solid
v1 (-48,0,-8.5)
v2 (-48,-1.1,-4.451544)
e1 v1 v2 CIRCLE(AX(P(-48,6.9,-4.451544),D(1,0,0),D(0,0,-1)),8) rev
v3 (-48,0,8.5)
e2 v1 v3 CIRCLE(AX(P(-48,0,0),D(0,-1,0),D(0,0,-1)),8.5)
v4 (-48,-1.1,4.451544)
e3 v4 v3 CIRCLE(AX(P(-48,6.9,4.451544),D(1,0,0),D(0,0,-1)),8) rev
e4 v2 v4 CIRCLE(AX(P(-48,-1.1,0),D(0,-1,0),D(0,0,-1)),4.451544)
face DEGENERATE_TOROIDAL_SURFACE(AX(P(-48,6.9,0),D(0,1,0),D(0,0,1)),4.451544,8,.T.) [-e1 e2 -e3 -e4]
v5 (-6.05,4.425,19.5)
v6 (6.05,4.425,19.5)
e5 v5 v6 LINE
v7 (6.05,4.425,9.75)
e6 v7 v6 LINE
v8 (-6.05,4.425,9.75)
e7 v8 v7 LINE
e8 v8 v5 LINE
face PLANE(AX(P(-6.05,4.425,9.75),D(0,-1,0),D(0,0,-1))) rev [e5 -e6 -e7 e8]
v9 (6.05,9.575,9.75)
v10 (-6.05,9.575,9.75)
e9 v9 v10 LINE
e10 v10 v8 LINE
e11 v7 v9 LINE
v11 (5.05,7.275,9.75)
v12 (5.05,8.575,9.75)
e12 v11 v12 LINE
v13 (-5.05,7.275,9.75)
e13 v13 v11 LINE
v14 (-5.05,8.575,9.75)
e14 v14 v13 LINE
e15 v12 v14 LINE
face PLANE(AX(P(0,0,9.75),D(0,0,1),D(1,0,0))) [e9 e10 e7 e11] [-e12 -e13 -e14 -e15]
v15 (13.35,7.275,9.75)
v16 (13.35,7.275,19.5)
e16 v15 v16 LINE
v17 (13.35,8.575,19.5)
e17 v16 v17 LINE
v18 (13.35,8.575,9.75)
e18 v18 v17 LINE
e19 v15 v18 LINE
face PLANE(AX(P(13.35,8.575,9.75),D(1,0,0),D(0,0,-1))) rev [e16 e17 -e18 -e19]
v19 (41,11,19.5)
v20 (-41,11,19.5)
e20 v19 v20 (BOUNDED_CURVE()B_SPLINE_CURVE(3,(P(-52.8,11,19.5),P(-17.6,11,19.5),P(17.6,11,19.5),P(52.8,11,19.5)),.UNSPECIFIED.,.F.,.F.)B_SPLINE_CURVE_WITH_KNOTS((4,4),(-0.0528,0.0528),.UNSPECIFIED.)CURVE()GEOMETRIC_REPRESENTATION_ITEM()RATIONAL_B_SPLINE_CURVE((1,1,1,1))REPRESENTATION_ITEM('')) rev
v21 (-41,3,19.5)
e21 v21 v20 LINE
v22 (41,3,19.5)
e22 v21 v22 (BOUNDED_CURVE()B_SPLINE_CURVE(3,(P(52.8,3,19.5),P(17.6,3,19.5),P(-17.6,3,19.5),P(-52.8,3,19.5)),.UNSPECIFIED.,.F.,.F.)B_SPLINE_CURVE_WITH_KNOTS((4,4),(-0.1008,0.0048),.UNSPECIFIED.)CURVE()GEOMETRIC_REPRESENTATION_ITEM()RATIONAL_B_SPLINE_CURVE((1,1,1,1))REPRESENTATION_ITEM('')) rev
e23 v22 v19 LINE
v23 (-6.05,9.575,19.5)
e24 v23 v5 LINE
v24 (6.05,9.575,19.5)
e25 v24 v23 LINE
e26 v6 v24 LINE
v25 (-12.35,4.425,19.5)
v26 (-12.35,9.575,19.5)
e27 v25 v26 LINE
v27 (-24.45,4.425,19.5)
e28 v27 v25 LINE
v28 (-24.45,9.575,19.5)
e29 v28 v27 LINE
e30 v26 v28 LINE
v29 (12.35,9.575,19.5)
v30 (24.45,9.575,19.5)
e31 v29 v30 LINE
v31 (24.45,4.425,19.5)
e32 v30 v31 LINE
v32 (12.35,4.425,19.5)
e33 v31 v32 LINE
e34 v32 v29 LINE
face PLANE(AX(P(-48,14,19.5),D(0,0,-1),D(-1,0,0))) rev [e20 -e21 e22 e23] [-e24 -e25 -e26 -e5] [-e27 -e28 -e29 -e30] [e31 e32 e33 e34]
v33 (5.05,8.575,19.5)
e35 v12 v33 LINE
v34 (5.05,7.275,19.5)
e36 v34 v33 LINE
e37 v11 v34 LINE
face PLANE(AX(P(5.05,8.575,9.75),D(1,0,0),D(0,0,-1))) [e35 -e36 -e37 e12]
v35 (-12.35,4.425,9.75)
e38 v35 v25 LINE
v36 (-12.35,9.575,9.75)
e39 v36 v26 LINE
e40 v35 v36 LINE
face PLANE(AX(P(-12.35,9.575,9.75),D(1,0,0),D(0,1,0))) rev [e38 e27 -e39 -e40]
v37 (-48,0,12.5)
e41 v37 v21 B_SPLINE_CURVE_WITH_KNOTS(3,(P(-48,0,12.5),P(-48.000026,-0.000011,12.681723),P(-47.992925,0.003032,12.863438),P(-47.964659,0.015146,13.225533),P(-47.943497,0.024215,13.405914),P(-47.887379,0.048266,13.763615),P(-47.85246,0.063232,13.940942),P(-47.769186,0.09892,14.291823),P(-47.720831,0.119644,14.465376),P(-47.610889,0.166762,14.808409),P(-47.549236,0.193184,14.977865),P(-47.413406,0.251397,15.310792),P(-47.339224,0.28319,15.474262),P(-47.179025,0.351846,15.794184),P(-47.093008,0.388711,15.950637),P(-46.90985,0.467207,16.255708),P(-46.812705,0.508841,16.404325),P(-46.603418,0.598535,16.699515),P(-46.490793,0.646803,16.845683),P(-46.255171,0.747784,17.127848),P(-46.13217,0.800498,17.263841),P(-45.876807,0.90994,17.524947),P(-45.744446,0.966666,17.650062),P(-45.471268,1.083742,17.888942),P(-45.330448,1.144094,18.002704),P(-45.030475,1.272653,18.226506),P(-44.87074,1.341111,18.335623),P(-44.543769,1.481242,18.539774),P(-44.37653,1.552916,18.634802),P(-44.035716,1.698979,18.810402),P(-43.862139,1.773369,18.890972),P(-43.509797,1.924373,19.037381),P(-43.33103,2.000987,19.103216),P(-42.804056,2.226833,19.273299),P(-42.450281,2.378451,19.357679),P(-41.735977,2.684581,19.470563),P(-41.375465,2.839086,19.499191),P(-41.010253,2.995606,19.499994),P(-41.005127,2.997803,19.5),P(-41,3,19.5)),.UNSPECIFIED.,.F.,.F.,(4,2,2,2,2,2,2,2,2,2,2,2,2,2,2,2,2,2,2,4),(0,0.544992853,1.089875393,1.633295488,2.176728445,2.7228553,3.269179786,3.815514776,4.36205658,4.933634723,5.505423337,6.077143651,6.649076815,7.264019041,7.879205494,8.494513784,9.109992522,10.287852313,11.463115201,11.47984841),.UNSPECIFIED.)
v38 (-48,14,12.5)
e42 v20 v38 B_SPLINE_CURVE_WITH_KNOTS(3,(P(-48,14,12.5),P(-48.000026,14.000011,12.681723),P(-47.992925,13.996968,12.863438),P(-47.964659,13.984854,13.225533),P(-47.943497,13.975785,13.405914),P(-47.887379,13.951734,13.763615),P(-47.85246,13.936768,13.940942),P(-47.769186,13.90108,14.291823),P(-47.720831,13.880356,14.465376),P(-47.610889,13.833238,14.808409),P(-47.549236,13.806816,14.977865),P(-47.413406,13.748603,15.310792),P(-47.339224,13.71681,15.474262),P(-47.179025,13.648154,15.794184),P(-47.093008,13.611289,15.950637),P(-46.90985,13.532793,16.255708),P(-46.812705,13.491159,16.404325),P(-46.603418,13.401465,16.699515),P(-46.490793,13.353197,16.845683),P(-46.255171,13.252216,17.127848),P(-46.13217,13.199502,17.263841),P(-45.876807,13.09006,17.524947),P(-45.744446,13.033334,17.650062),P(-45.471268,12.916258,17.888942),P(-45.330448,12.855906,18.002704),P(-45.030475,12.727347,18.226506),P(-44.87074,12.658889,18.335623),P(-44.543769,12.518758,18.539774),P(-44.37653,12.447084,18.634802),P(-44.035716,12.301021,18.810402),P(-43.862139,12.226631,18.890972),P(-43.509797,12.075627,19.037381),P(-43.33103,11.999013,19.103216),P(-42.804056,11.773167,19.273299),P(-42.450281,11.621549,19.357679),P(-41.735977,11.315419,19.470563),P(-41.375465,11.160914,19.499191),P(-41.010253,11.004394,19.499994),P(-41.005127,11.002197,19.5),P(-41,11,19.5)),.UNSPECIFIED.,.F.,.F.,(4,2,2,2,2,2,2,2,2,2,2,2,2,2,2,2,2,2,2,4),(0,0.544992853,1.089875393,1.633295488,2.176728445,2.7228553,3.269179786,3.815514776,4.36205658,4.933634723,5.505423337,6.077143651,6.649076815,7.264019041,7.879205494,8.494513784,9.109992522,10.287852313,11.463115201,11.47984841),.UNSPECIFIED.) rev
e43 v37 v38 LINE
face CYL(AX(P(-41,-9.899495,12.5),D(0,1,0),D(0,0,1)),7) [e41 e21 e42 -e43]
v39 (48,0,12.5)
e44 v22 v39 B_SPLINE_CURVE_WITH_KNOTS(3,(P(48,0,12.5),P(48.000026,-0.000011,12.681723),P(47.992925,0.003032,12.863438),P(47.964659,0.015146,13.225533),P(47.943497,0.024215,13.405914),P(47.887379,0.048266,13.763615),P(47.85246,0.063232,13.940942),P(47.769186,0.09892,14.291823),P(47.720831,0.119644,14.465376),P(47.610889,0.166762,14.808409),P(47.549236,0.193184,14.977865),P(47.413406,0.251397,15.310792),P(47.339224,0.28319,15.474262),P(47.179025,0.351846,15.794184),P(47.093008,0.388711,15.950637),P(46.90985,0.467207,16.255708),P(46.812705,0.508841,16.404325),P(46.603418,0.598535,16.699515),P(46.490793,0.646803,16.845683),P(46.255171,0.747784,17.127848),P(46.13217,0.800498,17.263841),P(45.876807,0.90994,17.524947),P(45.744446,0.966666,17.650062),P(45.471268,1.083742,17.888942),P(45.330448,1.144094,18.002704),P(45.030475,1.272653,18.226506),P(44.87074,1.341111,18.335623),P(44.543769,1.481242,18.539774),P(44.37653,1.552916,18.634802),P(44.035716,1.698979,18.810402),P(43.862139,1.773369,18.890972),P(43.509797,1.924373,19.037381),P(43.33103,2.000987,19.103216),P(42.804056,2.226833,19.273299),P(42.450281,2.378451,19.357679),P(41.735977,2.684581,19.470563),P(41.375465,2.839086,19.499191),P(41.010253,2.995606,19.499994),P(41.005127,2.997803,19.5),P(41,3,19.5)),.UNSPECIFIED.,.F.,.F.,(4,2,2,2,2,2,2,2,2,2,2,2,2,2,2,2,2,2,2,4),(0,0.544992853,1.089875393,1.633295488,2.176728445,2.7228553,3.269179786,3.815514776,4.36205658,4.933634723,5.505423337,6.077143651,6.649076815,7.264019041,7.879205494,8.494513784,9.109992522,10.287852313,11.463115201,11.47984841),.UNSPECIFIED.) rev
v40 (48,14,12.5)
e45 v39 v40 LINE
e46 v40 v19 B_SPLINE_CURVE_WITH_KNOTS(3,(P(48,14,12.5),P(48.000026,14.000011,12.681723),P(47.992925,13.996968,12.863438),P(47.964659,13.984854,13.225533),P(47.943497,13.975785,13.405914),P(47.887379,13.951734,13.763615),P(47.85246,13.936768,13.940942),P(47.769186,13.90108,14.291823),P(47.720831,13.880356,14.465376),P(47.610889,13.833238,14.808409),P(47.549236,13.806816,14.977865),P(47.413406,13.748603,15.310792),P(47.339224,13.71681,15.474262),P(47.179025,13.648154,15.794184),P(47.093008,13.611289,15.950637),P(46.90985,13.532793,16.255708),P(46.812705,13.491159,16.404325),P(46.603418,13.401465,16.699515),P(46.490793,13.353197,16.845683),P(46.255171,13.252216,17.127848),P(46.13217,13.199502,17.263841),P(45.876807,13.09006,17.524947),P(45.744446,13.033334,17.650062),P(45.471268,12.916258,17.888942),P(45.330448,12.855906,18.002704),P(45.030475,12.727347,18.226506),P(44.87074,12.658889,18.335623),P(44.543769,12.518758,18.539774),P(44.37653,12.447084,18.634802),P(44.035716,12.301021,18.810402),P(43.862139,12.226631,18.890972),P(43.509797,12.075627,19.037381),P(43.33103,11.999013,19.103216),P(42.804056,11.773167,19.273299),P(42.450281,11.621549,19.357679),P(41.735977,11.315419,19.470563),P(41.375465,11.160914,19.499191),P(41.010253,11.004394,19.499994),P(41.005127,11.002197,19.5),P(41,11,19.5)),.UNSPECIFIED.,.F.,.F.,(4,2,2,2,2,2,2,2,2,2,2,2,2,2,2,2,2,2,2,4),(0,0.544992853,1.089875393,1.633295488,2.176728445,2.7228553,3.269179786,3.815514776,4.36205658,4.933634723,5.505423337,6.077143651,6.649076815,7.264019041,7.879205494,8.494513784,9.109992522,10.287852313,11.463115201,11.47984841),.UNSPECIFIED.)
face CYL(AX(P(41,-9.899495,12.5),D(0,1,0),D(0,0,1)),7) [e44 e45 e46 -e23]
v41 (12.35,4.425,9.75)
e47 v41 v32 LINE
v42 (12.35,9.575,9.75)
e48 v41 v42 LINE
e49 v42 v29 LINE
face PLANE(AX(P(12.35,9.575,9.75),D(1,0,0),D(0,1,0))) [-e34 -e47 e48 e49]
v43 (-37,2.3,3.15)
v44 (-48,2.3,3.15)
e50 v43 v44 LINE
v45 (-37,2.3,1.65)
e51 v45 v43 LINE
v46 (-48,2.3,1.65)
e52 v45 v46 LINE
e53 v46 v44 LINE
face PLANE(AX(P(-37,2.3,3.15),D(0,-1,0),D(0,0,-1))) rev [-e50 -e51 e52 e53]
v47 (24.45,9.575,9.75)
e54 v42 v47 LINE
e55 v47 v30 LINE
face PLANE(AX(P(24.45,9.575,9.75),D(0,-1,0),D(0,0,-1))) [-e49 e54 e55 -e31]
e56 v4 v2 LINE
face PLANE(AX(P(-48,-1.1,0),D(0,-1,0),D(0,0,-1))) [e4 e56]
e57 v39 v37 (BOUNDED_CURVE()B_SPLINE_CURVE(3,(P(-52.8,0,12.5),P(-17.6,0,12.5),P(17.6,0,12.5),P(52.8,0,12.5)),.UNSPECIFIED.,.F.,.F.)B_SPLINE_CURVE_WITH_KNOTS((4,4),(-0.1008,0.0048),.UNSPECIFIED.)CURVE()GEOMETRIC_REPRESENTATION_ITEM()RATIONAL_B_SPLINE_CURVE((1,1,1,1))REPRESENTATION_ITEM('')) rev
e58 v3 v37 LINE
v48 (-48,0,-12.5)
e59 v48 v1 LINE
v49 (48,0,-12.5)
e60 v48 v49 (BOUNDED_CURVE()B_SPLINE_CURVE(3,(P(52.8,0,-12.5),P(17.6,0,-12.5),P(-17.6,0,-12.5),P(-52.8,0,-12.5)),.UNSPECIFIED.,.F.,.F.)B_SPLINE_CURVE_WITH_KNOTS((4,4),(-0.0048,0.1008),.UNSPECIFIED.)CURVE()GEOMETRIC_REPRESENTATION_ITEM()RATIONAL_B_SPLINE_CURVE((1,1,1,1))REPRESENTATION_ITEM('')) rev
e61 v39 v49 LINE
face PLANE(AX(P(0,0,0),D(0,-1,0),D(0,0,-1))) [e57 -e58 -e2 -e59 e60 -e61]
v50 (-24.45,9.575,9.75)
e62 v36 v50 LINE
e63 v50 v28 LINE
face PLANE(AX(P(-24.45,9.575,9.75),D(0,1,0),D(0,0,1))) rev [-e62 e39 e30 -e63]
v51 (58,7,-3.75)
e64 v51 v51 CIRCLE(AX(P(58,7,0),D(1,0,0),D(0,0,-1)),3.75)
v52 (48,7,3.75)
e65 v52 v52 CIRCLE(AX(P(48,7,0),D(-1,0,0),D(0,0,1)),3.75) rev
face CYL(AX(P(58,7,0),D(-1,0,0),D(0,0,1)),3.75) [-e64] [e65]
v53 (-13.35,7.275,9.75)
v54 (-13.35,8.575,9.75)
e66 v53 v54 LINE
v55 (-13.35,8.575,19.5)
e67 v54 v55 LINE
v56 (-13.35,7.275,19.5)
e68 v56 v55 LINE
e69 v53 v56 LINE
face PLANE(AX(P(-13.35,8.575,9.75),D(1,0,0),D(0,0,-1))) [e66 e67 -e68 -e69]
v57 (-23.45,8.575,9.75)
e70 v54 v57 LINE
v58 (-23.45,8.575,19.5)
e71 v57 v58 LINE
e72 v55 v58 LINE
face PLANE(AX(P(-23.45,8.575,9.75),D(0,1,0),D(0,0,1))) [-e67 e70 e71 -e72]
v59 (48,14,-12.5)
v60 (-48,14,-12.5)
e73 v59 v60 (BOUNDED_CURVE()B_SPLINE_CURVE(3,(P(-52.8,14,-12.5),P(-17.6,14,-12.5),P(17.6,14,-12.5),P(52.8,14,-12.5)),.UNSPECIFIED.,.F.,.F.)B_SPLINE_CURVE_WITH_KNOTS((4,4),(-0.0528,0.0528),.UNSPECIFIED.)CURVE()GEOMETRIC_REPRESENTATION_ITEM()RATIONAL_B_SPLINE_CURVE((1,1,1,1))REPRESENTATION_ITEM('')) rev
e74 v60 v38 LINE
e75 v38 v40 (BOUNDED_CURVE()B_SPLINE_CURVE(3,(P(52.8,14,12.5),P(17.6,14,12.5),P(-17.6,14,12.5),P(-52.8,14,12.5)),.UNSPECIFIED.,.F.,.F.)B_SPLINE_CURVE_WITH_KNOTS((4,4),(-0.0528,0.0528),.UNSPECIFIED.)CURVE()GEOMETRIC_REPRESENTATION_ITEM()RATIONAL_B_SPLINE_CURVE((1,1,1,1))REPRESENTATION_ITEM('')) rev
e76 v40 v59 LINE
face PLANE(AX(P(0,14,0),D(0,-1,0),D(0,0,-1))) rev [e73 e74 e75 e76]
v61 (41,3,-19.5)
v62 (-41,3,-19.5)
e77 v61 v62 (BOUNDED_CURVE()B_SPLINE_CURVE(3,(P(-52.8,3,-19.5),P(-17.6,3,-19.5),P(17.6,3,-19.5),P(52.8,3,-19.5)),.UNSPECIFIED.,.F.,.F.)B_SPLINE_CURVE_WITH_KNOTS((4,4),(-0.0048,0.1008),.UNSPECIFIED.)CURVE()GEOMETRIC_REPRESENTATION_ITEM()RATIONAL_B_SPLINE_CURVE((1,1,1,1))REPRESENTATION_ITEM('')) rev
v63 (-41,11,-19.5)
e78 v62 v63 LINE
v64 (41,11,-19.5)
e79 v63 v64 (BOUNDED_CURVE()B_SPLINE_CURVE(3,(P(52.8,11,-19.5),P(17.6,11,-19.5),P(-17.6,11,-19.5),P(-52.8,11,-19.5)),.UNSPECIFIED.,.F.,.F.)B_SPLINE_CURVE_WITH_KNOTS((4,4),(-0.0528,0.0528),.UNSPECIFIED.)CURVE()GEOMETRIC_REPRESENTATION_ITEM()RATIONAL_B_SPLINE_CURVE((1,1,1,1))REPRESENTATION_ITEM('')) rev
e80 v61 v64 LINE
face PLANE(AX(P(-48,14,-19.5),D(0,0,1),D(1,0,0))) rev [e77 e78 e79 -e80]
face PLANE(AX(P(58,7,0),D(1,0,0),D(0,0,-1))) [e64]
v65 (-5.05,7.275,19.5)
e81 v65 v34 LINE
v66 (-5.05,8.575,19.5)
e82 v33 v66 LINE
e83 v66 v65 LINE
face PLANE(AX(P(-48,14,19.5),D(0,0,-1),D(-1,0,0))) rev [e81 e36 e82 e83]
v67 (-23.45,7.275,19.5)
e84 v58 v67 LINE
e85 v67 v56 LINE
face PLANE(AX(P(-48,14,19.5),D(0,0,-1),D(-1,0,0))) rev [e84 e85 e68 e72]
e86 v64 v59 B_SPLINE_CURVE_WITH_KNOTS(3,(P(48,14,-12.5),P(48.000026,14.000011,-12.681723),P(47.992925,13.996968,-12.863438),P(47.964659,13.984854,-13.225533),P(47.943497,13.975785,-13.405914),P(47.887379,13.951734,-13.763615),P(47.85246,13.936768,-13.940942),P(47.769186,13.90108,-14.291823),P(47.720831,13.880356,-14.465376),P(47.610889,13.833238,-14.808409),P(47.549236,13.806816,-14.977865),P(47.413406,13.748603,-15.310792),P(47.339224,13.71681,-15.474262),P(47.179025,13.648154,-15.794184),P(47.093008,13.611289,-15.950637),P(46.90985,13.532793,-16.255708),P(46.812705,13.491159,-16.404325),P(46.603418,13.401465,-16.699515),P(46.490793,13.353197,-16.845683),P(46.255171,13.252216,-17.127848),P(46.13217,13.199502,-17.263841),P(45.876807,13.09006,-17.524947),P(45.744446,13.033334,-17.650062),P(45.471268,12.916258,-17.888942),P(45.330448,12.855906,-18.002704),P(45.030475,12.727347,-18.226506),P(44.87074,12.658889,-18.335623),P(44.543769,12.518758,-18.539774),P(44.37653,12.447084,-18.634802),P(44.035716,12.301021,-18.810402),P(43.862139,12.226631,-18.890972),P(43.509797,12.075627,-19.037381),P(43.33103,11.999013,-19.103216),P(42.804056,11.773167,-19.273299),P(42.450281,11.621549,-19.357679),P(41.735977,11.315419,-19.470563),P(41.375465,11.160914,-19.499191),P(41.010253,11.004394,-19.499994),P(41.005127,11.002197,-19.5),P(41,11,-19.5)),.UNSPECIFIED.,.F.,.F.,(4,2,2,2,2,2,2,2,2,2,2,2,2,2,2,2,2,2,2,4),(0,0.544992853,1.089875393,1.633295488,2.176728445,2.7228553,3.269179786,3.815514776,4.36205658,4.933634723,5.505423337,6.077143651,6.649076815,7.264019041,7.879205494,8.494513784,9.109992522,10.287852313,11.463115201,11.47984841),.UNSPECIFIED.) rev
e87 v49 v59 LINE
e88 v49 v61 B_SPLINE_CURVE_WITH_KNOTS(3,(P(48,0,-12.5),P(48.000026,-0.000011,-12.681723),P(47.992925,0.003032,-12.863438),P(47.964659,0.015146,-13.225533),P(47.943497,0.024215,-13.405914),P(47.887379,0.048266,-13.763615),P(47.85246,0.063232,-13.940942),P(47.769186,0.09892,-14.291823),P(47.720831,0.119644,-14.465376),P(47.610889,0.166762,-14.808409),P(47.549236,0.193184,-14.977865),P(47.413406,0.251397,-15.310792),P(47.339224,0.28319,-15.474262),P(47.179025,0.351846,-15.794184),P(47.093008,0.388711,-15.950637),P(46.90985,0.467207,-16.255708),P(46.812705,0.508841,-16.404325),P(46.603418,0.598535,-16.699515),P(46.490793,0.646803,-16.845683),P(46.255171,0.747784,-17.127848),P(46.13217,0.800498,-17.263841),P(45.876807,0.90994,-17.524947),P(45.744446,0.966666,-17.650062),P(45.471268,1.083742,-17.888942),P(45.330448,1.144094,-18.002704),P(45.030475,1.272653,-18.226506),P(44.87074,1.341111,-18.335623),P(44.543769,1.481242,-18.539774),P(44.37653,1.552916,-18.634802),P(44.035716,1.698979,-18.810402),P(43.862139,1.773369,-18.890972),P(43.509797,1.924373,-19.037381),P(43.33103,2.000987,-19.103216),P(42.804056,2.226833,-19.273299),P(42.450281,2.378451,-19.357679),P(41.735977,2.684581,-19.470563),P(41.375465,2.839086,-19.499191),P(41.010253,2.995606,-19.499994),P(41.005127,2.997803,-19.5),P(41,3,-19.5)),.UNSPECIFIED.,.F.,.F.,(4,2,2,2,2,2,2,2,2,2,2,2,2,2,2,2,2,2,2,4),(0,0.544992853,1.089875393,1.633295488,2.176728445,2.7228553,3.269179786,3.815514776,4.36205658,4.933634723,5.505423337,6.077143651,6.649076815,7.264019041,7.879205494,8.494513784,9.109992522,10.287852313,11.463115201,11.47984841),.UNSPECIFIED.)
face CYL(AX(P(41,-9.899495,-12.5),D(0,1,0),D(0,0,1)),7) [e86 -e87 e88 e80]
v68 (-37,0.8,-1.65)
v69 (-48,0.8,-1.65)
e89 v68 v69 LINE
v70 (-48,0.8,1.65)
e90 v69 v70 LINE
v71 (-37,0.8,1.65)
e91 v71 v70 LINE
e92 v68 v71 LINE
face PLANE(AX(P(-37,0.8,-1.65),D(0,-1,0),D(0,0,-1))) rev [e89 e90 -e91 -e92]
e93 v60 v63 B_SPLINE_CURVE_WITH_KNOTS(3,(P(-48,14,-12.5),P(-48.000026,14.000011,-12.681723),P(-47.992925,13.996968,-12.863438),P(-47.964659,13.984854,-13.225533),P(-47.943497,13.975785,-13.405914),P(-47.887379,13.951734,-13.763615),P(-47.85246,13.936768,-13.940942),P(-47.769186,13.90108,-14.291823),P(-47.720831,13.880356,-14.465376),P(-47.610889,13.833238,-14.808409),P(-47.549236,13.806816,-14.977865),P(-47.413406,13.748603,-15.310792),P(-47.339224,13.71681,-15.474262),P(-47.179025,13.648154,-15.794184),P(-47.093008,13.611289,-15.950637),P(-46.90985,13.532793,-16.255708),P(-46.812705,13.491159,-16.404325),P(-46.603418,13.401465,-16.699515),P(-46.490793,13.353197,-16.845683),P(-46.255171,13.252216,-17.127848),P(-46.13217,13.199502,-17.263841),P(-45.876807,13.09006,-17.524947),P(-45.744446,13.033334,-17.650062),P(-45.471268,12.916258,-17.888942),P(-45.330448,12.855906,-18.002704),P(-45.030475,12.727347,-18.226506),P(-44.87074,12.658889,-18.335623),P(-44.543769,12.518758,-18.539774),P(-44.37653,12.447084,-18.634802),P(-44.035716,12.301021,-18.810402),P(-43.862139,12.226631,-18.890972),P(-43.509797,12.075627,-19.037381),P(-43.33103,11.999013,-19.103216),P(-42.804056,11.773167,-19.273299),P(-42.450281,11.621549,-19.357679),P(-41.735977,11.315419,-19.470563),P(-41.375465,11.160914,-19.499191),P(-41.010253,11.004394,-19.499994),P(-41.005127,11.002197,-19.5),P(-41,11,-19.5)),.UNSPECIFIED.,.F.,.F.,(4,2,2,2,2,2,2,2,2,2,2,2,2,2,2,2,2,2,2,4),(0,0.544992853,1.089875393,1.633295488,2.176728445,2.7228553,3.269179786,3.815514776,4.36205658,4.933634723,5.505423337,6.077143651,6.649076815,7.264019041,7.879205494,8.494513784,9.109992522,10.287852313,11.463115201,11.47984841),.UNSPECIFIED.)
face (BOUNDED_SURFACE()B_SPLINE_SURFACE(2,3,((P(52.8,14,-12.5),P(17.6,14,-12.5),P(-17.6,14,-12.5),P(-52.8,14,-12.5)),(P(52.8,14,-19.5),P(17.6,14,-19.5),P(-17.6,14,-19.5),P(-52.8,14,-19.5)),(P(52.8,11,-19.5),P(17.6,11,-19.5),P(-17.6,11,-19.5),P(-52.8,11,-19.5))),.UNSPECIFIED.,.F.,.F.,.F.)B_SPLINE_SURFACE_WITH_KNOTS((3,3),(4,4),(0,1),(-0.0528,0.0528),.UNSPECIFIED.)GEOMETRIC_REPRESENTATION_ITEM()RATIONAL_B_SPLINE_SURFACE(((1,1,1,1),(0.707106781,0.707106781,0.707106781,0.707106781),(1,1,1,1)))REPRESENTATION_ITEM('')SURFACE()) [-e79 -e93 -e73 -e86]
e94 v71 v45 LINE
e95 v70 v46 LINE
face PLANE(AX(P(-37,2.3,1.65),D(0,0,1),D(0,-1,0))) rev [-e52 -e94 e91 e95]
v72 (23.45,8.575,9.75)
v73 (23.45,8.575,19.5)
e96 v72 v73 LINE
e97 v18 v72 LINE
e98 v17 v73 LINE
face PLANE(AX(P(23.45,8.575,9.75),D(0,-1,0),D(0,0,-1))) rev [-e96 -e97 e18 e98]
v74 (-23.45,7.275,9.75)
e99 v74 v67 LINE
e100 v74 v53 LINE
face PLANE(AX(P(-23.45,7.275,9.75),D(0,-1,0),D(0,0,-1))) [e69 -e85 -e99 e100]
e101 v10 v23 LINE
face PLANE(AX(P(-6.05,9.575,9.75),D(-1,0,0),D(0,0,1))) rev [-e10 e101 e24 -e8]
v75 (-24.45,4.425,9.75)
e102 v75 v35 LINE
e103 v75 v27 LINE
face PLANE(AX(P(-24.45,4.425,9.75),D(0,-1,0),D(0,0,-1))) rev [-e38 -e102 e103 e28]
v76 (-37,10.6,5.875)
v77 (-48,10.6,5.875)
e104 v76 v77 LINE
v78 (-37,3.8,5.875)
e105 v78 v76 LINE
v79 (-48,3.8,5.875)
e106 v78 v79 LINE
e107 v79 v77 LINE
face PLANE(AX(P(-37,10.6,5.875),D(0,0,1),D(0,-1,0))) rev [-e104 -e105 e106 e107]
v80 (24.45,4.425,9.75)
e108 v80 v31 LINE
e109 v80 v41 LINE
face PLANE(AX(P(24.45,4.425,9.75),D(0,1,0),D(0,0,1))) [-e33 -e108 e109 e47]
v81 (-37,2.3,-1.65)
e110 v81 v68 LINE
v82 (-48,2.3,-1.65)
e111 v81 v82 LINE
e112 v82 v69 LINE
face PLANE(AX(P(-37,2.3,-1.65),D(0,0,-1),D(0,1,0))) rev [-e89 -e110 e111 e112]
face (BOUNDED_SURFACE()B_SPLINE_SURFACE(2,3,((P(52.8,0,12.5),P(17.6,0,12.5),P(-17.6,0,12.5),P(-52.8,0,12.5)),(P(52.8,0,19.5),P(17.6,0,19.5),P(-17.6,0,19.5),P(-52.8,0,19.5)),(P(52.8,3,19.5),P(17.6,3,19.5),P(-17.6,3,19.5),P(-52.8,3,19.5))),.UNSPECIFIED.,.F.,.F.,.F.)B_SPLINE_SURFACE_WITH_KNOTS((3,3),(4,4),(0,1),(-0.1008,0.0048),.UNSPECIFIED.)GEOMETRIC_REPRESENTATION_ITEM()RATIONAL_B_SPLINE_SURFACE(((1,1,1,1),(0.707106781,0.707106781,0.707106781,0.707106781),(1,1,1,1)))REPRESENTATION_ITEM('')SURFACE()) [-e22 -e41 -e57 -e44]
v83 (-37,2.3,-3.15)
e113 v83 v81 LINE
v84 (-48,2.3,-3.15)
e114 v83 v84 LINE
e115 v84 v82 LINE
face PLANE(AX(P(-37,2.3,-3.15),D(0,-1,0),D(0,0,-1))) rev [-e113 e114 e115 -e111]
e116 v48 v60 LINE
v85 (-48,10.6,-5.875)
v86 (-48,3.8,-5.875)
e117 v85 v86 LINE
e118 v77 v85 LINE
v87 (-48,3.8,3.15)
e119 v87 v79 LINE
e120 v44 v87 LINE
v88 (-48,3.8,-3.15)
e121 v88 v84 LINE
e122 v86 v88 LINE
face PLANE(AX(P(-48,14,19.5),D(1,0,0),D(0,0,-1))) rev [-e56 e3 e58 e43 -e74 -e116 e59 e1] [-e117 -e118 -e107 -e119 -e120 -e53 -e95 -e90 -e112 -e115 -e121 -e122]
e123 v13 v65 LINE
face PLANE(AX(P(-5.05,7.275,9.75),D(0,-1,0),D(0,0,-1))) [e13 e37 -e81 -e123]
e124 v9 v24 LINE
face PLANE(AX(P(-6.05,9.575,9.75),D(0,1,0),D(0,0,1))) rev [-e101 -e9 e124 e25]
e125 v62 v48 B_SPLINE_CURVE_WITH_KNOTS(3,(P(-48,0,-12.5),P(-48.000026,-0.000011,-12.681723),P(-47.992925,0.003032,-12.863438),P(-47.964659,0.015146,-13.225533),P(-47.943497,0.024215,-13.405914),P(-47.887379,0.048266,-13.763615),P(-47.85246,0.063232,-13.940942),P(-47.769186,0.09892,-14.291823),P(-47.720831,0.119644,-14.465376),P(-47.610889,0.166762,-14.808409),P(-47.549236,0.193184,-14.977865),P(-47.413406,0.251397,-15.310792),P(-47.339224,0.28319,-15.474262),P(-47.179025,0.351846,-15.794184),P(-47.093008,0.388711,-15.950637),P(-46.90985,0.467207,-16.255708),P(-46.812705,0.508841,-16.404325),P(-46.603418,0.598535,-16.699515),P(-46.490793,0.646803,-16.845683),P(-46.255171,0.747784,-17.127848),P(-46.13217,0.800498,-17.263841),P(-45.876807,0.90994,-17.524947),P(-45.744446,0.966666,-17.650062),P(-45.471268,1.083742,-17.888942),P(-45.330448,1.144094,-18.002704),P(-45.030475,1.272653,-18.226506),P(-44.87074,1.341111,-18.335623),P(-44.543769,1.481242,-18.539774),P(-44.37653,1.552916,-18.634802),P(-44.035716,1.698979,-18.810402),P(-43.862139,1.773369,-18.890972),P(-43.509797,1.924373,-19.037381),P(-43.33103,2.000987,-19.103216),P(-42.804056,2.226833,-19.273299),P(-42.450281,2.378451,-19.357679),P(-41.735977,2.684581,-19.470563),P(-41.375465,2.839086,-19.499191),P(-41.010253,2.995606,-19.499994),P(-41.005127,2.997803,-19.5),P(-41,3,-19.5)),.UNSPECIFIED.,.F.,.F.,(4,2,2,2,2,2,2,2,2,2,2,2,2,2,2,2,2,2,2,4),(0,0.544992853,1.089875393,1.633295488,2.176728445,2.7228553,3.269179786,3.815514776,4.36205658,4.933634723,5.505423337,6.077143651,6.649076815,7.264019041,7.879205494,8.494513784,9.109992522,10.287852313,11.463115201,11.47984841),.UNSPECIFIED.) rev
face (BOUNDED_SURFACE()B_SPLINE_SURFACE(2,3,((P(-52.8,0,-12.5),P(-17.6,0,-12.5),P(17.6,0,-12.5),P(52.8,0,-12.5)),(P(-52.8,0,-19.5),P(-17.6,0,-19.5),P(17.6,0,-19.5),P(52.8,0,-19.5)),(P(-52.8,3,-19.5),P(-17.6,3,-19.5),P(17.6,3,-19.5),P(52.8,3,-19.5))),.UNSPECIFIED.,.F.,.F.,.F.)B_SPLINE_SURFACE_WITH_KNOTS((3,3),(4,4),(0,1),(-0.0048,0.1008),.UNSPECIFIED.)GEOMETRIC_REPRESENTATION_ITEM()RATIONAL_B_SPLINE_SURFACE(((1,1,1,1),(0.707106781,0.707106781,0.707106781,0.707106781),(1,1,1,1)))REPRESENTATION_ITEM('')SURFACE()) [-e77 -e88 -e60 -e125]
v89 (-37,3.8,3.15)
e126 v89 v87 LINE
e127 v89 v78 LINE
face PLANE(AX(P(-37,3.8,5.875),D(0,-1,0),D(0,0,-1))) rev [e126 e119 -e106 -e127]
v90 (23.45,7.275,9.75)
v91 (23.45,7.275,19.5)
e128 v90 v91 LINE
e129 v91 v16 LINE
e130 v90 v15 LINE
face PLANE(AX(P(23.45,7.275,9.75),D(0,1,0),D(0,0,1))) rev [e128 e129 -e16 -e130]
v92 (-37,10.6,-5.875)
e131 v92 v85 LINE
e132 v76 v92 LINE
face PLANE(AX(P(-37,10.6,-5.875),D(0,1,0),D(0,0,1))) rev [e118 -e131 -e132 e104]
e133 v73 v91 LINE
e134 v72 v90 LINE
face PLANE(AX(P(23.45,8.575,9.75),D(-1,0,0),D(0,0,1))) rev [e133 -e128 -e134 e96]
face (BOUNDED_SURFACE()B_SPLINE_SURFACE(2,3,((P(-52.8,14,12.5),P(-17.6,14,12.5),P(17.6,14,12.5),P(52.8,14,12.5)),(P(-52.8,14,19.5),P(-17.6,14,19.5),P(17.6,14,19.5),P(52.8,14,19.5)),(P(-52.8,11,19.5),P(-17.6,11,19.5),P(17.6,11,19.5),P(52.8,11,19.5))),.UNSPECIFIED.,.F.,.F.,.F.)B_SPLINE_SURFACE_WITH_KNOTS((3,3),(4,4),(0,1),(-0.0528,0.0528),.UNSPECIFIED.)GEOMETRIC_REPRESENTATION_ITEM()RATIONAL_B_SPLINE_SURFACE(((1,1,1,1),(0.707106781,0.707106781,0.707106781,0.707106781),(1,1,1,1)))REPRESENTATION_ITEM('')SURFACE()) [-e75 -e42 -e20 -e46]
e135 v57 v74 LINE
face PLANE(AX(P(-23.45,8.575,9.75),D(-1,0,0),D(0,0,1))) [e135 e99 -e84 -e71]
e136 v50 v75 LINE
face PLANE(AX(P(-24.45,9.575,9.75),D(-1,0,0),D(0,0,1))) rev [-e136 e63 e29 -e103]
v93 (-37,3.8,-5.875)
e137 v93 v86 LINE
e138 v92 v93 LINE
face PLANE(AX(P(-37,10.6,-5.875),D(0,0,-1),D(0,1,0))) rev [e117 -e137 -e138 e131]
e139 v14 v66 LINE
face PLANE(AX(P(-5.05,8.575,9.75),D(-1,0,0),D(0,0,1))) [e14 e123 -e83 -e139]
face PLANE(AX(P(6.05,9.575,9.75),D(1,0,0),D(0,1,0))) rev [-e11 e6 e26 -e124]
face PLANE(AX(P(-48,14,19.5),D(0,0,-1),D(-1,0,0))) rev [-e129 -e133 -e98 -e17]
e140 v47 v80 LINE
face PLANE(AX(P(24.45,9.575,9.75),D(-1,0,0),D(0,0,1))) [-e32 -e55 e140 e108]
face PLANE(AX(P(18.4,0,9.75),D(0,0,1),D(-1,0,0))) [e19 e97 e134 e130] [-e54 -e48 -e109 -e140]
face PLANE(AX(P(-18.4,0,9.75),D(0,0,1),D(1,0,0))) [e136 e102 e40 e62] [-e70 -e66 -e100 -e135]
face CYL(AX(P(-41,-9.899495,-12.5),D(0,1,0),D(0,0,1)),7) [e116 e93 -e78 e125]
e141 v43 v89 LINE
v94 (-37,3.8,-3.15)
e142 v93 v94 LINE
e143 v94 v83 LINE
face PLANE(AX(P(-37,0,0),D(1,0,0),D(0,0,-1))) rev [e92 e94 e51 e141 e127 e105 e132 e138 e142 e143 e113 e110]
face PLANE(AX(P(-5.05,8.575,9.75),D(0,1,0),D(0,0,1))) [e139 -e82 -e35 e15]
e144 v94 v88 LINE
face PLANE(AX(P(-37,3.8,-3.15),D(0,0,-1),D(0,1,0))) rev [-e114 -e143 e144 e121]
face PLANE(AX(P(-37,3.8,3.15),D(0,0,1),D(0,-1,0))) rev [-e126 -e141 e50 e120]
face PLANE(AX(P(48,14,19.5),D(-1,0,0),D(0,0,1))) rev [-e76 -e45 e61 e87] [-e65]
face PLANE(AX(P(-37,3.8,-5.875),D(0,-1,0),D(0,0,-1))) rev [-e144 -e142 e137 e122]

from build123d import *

# Parameters (mm, degrees)
SZKIC1_W                    = 96
SZKIC1_H                    = 39
DODANIE_WYCI_GNI_CIE1_DEPTH = 14
ZAOKR_GLENIE2_SIZE          = 3
ZAOKR_GLENIE2_SIZE_2        = 7
WYTNIJ_WYCI_GNI_CIE1_REACH  = 55.668
SZKIC3_R                    = 3.75
DODANIE_WYCI_GNI_CIE2_DEPTH = 10
DODANIE_WYCI_GNI_CIE3_DEPTH = 1.1
ZAOKR_GLENIE3_R             = 8
WYTNIJ_WYCI_GNI_CIE2_DEPTH  = 11
SZKIC6_W                    = 12.1
SZKIC6_H                    = 5.15
SZKIC6_W_2                  = 10.1
SZKIC6_H_2                  = 1.3
WYTNIJ_WYCI_GNI_CIE3_DEPTH  = 9.75
SZYK_LINIOWY1_COUNT         = 2
SZYK_LINIOWY1_PITCH         = 18.4
LUSTRO1_COPY_1_SKETCH_W     = 12.1
LUSTRO1_COPY_1_SKETCH_H     = 5.15
LUSTRO1_COPY_1_SKETCH_W_2   = 10.1
LUSTRO1_COPY_1_SKETCH_H_2   = 1.3
LUSTRO1_COPY_1_DEPTH        = 9.75
LUSTRO1_COPY_2_SKETCH_W     = 12.1
LUSTRO1_COPY_2_SKETCH_H     = 5.15
LUSTRO1_COPY_2_SKETCH_W_2   = 10.1
LUSTRO1_COPY_2_SKETCH_H_2   = 1.3
LUSTRO1_COPY_2_DEPTH        = 9.75


with BuildPart() as part:
    # Szkic1 → Dodanie-wyciągnięcie1 (new body)
    with BuildSketch(Plane(origin=(0, 0, 0), x_dir=(1, 0, 0), z_dir=(0, 1, 0))):
        Rectangle(SZKIC1_W, SZKIC1_H)
    extrude(amount=DODANIE_WYCI_GNI_CIE1_DEPTH)

    # Zaokrąglenie2
    # an asymmetric fillet: 7, 3 mm, written as the material it takes off along each edge
    with BuildSketch(Plane(origin=(65.5, 0, -19.5), x_dir=(0, 1, 0), z_dir=(-1, 0, 0)), Plane(origin=(-65.5, 0, 19.5), x_dir=(0, 1, 0), z_dir=(1, 0, 0))) as zaokr_glenie2_piece_1:
        with BuildLine():
            Bezier((ZAOKR_GLENIE2_SIZE, 0), (0, 0), (0, -ZAOKR_GLENIE2_SIZE_2), weights=[1, 0.707106781, 1])
            Line((0, -ZAOKR_GLENIE2_SIZE_2), (0, 0))
            Line((0, 0), (ZAOKR_GLENIE2_SIZE, 0))
        make_face()
    extrude(amount=131, mode=Mode.SUBTRACT)
    with BuildSketch(Plane(origin=(65.5, 14, -19.5), x_dir=(0, -1, 0), z_dir=(-1, 0, 0)), Plane(origin=(-65.5, 14, 19.5), x_dir=(0, -1, 0), z_dir=(1, 0, 0))) as zaokr_glenie2_piece_2:
        with BuildLine():
            Bezier((ZAOKR_GLENIE2_SIZE, 0), (0, 0), (0, ZAOKR_GLENIE2_SIZE_2), weights=[1, 0.707106781, 1])
            Line((0, ZAOKR_GLENIE2_SIZE_2), (0, 0))
            Line((0, 0), (ZAOKR_GLENIE2_SIZE, 0))
        make_face()
    extrude(amount=131, mode=Mode.SUBTRACT)

    # Wytnij-wyciągnięcie1: up to this face of the body (flat: up to its plane)
    wytnij_wyci_gni_cie1_end = Plane(part.part.faces().sort_by_distance((0, 0, 0))[0])
    # Szkic2 → Wytnij-wyciągnięcie1 (cut, up to the picked face)
    with BuildSketch(Plane(origin=(0, 14, 0), x_dir=(1, 0, 0), z_dir=(0, 1, 0)), mode=Mode.PRIVATE) as wytnij_wyci_gni_cie1_sk1:
        with BuildLine():
            Line((-48, -19.5), (-41, -19.5))
            ThreePointArc((-41, -19.5), (-45.949747468, -17.449747468), (-48, -12.5))
            Line((-48, -12.5), (-48, -19.5))
        make_face()
    wytnij_wyci_gni_cie1_tool1 = split(extrude(wytnij_wyci_gni_cie1_sk1.sketch, amount=-WYTNIJ_WYCI_GNI_CIE1_REACH, mode=Mode.PRIVATE), bisect_by=wytnij_wyci_gni_cie1_end, keep=Keep.BOTH, mode=Mode.PRIVATE)
    # Szkic2 → Wytnij-wyciągnięcie1 (cut, up to the picked face)
    with BuildSketch(Plane(origin=(0, 14, 0), x_dir=(1, 0, 0), z_dir=(0, 1, 0)), mode=Mode.PRIVATE) as wytnij_wyci_gni_cie1_sk2:
        with BuildLine():
            Line((-48, 19.5), (-41, 19.5))
            ThreePointArc((-41, 19.5), (-45.949747468, 17.449747468), (-48, 12.5))
            Line((-48, 12.5), (-48, 19.5))
        make_face()
    wytnij_wyci_gni_cie1_tool2 = split(extrude(wytnij_wyci_gni_cie1_sk2.sketch, amount=-WYTNIJ_WYCI_GNI_CIE1_REACH, mode=Mode.PRIVATE), bisect_by=wytnij_wyci_gni_cie1_end, keep=Keep.BOTH, mode=Mode.PRIVATE)
    # Szkic2 → Wytnij-wyciągnięcie1 (cut, up to the picked face)
    with BuildSketch(Plane(origin=(0, 14, 0), x_dir=(1, 0, 0), z_dir=(0, 1, 0)), mode=Mode.PRIVATE) as wytnij_wyci_gni_cie1_sk3:
        with BuildLine():
            Line((48, -19.5), (48, -12.5))
            ThreePointArc((48, -12.5), (45.949747468, -17.449747468), (41, -19.5))
            Line((41, -19.5), (48, -19.5))
        make_face()
    wytnij_wyci_gni_cie1_tool3 = split(extrude(wytnij_wyci_gni_cie1_sk3.sketch, amount=-WYTNIJ_WYCI_GNI_CIE1_REACH, mode=Mode.PRIVATE), bisect_by=wytnij_wyci_gni_cie1_end, keep=Keep.BOTH, mode=Mode.PRIVATE)
    # Szkic2 → Wytnij-wyciągnięcie1 (cut, up to the picked face)
    with BuildSketch(Plane(origin=(0, 14, 0), x_dir=(1, 0, 0), z_dir=(0, 1, 0)), mode=Mode.PRIVATE) as wytnij_wyci_gni_cie1_sk4:
        with BuildLine():
            Line((41, 19.5), (48, 19.5))
            Line((48, 19.5), (48, 12.5))
            ThreePointArc((48, 12.5), (45.949747468, 17.449747468), (41, 19.5))
        make_face()
    wytnij_wyci_gni_cie1_tool4 = split(extrude(wytnij_wyci_gni_cie1_sk4.sketch, amount=-WYTNIJ_WYCI_GNI_CIE1_REACH, mode=Mode.PRIVATE), bisect_by=wytnij_wyci_gni_cie1_end, keep=Keep.BOTH, mode=Mode.PRIVATE)
    add(wytnij_wyci_gni_cie1_tool1.solids().sort_by(Axis((-46.436424, 14, 17.936424), (0, -1, 0)))[0], mode=Mode.SUBTRACT)
    add(wytnij_wyci_gni_cie1_tool2.solids().sort_by(Axis((-46.436424, 14, -17.936424), (0, -1, 0)))[0], mode=Mode.SUBTRACT)
    add(wytnij_wyci_gni_cie1_tool3.solids().sort_by(Axis((46.436424, 14, 17.936424), (0, -1, 0)))[0], mode=Mode.SUBTRACT)
    add(wytnij_wyci_gni_cie1_tool4.solids().sort_by(Axis((46.436424, 14, -17.936424), (0, -1, 0)))[0], mode=Mode.SUBTRACT)

    # Szkic3 → Dodanie-wyciągnięcie2 (add)
    with BuildSketch(Plane(origin=(48, 0, 0), x_dir=(0, 0, -1), z_dir=(1, 0, 0))):
        with Locations(Location((0, 7, 0), (0, 0, 180))):
            Circle(SZKIC3_R)
    extrude(amount=DODANIE_WYCI_GNI_CIE2_DEPTH)

    # Szkic4 → Dodanie-wyciągnięcie3 (add)
    with BuildSketch(Plane.XZ):
        with BuildLine():
            Line((-48, 8.5), (-48, -8.5))
            ThreePointArc((-48, -8.5), (-39.5, 0), (-48, 8.5))
        make_face()
    extrude(amount=DODANIE_WYCI_GNI_CIE3_DEPTH)

    # Zaokrąglenie3
    # the kernel refuses this fillet: 8 mm, written as the material it takes off along each edge
    with BuildSketch(Plane(origin=(-48, -1.1, 0), x_dir=(-0.9293459551729958, 0, -0.36921009683321493), z_dir=(-0.36921009683321493, 0, 0.9293459551729958))) as zaokr_glenie3_piece_1:
        with BuildLine():
            CenterArc((4.451543504, -8), ZAOKR_GLENIE3_R, 59.598452337, 30.401547663)
            Line((4.451543504, 0), (4.451543504, 0.16))
            Line((4.451543504, 0.16), (8.5, 0.16))
            Line((8.5, 0.16), (8.66, 0))
            ThreePointArc((8.66, 0), (8.66, -0.55), (8.58096913, -0.962))
            Line((8.58096913, -0.962), (8.5, -1.1))
        make_face()
    revolve(axis=Axis((-48, -1.1, 0), (0, -1, 0)), revolution_arc=316.666179678, mode=Mode.SUBTRACT)

    # Szkic5 → Wytnij-wyciągnięcie2 (cut)
    with BuildSketch(Plane.ZY.offset(48)):
        Polygon((-5.875, 10.6), (5.875, 10.6), (5.875, 3.8), (3.15, 3.8), (3.15, 2.3), (1.65, 2.3), (1.65, 0.8), (-1.65, 0.8), (-1.65, 2.3), (-3.15, 2.3), (-3.15, 3.8), (-5.875, 3.8), align=None)
    extrude(amount=-WYTNIJ_WYCI_GNI_CIE2_DEPTH, mode=Mode.SUBTRACT)

    # Szkic6 → Wytnij-wyciągnięcie3 (cut)
    with BuildSketch(Plane.XY.offset(19.5)):
        with Locations((0, 7)):
            Rectangle(SZKIC6_W, SZKIC6_H)
        with Locations((0, 7.925)):
            Rectangle(SZKIC6_W_2, SZKIC6_H_2, mode=Mode.SUBTRACT)
    wytnij_wyci_gni_cie3 = extrude(amount=-WYTNIJ_WYCI_GNI_CIE3_DEPTH, mode=Mode.SUBTRACT)

    # Szyk liniowy1: Wytnij-wyciągnięcie3 ×2
    with Locations(*[(-i * SZYK_LINIOWY1_PITCH, 0, 0) for i in range(1, SZYK_LINIOWY1_COUNT)]):
        add(wytnij_wyci_gni_cie3, mode=Mode.SUBTRACT)

    # Lustro1 copy 1 sketch → Lustro1 copy 1 (cut)
    with BuildSketch(Plane(origin=(18.4, 0, 19.5), x_dir=(-1, 0, 0), z_dir=(0, 0, 1))):
        with Locations((0, -7)):
            Rectangle(LUSTRO1_COPY_1_SKETCH_W, LUSTRO1_COPY_1_SKETCH_H)
        with Locations((0, -7.925)):
            Rectangle(LUSTRO1_COPY_1_SKETCH_W_2, LUSTRO1_COPY_1_SKETCH_H_2, mode=Mode.SUBTRACT)
    extrude(amount=-LUSTRO1_COPY_1_DEPTH, mode=Mode.SUBTRACT)

    # Lustro1 copy 2 sketch → Lustro1 copy 2 (cut)
    with BuildSketch(Plane(origin=(0, 0, 19.5), x_dir=(-1, 0, 0), z_dir=(0, 0, 1))):
        with Locations((0, -7)):
            Rectangle(LUSTRO1_COPY_2_SKETCH_W, LUSTRO1_COPY_2_SKETCH_H)
        with Locations((0, -7.925)):
            Rectangle(LUSTRO1_COPY_2_SKETCH_W_2, LUSTRO1_COPY_2_SKETCH_H_2, mode=Mode.SUBTRACT)
    extrude(amount=-LUSTRO1_COPY_2_DEPTH, mode=Mode.SUBTRACT)


solid = part.part
